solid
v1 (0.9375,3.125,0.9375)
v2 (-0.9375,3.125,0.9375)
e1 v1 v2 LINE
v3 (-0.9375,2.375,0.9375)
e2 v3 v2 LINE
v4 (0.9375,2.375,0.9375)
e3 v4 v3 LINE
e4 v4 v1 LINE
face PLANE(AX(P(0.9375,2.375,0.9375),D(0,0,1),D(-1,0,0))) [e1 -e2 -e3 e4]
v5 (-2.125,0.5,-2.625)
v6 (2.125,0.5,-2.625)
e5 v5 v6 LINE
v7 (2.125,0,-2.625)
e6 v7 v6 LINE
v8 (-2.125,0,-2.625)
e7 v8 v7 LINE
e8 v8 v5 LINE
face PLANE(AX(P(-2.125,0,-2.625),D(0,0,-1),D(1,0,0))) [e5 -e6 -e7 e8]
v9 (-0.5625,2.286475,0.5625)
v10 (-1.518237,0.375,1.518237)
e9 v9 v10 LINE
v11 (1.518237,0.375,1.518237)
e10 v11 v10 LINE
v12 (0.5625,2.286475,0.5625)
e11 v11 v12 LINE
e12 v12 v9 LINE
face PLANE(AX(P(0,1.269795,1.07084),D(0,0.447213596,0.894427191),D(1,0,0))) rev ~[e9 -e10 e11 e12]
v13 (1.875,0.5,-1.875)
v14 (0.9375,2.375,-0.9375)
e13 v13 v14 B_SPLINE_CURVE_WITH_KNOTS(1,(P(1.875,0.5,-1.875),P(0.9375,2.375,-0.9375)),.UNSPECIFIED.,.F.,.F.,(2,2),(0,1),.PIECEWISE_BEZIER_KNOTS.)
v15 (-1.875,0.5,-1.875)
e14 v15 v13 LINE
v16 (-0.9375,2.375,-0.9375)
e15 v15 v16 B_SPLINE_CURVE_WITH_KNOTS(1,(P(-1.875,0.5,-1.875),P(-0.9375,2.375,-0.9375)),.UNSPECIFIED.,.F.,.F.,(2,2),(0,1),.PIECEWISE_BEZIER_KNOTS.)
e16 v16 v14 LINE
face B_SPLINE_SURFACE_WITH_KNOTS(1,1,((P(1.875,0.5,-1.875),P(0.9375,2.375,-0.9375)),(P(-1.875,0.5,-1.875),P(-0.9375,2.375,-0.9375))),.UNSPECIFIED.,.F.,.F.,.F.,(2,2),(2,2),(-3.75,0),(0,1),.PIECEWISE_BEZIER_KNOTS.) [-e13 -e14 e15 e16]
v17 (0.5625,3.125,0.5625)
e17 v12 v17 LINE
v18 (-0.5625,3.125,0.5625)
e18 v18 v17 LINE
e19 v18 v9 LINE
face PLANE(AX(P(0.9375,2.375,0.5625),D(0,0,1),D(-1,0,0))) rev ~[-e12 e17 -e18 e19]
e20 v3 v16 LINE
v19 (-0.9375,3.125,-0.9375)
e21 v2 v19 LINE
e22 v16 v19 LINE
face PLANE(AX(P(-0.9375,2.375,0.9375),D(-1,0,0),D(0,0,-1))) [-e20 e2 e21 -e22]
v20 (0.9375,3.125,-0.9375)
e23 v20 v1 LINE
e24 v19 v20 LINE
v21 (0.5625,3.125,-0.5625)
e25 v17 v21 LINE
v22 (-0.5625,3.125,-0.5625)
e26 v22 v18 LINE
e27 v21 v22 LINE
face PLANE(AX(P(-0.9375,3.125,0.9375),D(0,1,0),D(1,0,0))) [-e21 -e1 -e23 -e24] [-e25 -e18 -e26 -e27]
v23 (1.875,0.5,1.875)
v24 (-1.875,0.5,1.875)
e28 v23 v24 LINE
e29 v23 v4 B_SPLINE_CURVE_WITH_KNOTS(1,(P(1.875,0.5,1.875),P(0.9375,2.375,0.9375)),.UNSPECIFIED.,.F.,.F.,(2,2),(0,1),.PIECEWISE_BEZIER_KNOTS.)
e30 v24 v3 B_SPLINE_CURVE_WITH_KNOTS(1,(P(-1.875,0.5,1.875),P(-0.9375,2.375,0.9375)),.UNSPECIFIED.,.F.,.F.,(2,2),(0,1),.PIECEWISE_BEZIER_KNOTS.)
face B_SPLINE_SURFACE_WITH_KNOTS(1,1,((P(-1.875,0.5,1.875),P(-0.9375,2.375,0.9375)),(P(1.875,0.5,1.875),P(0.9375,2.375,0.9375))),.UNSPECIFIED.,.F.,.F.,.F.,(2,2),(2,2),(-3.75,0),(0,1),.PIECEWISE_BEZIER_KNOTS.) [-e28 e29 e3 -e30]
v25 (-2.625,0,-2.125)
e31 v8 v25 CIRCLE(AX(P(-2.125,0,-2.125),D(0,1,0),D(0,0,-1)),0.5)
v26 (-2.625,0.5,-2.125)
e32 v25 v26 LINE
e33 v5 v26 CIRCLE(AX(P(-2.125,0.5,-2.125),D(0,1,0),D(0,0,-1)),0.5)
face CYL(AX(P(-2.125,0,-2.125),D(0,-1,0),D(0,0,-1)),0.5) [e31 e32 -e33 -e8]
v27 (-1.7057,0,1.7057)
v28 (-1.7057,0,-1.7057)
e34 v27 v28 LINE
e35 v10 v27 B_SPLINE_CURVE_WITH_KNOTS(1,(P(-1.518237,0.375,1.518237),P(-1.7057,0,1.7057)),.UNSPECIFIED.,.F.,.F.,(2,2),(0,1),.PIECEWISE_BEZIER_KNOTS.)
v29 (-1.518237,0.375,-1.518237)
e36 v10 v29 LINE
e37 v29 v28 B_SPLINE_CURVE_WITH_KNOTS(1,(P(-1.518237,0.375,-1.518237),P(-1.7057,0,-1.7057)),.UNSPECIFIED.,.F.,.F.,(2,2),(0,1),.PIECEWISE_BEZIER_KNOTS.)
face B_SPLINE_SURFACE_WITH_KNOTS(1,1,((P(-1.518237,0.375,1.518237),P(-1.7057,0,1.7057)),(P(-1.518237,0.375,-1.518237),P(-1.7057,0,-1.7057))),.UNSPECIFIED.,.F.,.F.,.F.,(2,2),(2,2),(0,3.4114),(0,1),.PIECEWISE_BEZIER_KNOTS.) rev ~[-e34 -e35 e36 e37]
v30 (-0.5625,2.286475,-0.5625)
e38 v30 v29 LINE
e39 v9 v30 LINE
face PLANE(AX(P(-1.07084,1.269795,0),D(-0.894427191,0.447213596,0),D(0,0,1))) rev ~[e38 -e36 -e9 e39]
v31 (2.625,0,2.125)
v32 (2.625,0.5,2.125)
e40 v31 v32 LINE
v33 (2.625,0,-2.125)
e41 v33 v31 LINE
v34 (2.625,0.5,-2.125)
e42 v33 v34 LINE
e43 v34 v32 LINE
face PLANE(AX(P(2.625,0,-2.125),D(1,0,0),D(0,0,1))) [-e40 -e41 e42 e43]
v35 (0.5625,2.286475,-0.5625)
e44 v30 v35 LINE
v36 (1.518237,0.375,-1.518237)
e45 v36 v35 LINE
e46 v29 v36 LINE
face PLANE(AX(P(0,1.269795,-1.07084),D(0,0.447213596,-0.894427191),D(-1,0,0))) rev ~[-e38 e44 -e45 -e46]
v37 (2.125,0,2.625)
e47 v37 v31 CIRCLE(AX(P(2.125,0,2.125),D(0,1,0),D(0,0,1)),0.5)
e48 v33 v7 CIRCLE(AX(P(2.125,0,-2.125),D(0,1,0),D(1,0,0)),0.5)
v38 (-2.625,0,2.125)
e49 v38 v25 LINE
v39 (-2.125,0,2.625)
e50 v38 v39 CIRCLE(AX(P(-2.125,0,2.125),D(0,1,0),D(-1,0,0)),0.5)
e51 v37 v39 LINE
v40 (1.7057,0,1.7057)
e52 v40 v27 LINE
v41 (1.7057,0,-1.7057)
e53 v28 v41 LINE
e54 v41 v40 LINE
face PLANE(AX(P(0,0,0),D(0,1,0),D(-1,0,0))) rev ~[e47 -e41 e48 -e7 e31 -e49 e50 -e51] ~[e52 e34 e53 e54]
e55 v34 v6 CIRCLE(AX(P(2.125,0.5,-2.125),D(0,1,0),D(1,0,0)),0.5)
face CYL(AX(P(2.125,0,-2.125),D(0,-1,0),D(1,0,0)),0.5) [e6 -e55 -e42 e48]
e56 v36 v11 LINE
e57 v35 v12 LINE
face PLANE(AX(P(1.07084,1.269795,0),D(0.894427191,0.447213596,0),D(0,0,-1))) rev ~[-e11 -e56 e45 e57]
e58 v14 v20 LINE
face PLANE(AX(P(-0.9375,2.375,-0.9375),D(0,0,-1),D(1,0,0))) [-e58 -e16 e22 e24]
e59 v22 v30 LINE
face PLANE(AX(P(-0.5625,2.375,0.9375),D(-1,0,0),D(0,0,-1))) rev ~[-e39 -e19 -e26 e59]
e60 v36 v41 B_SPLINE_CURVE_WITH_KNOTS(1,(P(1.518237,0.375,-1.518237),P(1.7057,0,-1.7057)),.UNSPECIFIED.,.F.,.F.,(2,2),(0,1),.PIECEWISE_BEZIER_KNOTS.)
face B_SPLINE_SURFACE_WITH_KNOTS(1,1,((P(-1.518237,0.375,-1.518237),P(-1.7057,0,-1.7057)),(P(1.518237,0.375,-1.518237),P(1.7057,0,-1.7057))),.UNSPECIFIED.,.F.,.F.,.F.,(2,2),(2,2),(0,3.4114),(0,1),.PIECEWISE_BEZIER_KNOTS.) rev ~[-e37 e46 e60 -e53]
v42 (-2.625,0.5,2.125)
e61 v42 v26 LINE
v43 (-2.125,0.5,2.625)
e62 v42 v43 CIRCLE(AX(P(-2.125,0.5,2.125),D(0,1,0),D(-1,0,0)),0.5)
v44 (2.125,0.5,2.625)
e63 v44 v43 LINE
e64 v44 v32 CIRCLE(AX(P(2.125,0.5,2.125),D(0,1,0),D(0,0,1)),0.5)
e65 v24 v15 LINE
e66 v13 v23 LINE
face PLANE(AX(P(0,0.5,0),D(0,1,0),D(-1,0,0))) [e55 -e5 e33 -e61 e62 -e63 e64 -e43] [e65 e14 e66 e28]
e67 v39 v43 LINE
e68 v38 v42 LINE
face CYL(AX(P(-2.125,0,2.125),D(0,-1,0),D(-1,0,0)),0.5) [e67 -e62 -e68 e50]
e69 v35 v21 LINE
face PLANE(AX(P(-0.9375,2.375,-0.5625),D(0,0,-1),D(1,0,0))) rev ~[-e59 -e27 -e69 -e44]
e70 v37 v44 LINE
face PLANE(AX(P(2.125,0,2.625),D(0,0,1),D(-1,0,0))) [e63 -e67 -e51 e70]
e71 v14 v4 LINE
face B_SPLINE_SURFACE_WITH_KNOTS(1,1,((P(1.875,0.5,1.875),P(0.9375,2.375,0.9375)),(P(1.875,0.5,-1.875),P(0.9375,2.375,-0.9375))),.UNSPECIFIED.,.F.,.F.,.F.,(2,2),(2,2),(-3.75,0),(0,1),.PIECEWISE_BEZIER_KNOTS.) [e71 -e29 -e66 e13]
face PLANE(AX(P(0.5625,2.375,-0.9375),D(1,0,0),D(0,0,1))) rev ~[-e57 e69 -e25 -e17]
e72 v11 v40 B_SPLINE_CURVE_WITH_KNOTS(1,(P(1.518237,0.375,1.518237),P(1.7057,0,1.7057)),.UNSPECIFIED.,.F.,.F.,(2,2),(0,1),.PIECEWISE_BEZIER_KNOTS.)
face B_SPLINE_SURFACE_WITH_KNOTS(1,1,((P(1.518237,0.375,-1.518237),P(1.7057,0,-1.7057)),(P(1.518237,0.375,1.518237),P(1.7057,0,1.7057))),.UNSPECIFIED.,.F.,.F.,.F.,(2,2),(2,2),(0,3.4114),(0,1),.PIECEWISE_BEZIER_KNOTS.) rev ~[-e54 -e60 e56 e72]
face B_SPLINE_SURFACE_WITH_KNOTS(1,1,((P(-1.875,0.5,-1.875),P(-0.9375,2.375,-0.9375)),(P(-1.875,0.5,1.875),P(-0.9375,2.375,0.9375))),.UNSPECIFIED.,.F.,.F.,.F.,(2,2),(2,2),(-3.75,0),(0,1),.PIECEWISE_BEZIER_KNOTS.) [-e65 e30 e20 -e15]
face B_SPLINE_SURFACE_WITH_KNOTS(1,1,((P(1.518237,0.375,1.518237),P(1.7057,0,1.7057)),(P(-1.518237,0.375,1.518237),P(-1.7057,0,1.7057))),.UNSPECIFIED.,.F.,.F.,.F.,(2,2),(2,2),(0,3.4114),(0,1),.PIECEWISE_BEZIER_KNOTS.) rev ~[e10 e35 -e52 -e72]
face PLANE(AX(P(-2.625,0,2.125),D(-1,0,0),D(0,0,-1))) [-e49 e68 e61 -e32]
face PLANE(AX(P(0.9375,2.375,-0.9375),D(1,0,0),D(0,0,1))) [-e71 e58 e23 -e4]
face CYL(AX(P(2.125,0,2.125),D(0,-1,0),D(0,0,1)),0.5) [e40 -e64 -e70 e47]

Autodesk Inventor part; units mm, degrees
ref_plane "YZ Plane" through (0, 0, 0) normal (1, 0, 0) x (0, 1, 0)
ref_plane "XZ Plane" through (0, 0, 0) normal (0, 1, 0) x (-1, 0, 0)
sketch "Boceto1" plane through (0, 0, 0) normal (0, 1, 0) x (-1, 0, 0)
  line L0 (-2.125, 2.625) -> (2.125, 2.625)
  line L1 (2.625, 2.125) -> (2.625, -2.125)
  line L2 (2.125, -2.625) -> (-2.125, -2.625)
  line L3 (-2.625, -2.125) -> (-2.625, 2.125)
  line L4 (-2.625, 2.625) -> (2.625, -2.625) construction
  line L5 (2.625, 2.625) -> (-2.625, -2.625) construction
  arc A0 (2.625, 2.125) -> (2.125, 2.625) centre (2.125, 2.125) ccw
  arc A1 (2.125, -2.625) -> (2.625, -2.125) centre (2.125, -2.125) ccw
  arc A2 (-2.625, -2.125) -> (-2.125, -2.625) centre (-2.125, -2.125) ccw
  arc A3 (-2.125, 2.625) -> (-2.625, 2.125) centre (-2.125, 2.125) ccw
  point P0 (0, 0)
  point P1 (0, -2.625)
  dimension "d0" = 0.5
  dimension "d1" = 5.25
  dimension "d2" = 5.25
extrude "Extrusión1" add sketch "Boceto1" along normal blind 0.5
sketch "Boceto2" plane through (0, 0.5, 0) normal (0, 1, 0) x (1, 0, 0)
  line L0 (1.875, -1.875) -> (-1.875, -1.875)
  line L1 (-1.875, -1.875) -> (-1.875, 1.875)
  line L2 (-1.875, 1.875) -> (1.875, 1.875)
  line L3 (1.875, 1.875) -> (1.875, -1.875)
  line L4 (1.875, -1.875) -> (-1.875, 1.875) construction
  line L5 (-1.875, -1.875) -> (1.875, 1.875) construction
  point P0 (0, 0)
  dimension "d5" = 3.75
  dimension "d6" = 3.75
ref_plane "Plano de trabajo1" through (0, 2.375, 0) normal (0, 1, 0) x (1, 0, 0)
sketch "Boceto3" plane through (0, 2.375, 0) normal (0, 1, 0) x (1, 0, 0)
  line L0 (0.9375, -0.9375) -> (-0.9375, -0.9375)
  line L1 (-0.9375, -0.9375) -> (-0.9375, 0.9375)
  line L2 (-0.9375, 0.9375) -> (0.9375, 0.9375)
  line L3 (0.9375, 0.9375) -> (0.9375, -0.9375)
  line L4 (0.9375, -0.9375) -> (-0.9375, 0.9375) construction
  line L5 (-0.9375, -0.9375) -> (0.9375, 0.9375) construction
  point P0 (0, 0)
  dimension "d8" = 1.875
  dimension "d9" = 1.875
loft "Solevación1" add profiles "Boceto2", "Boceto3"
sketch "Boceto4" plane through (-0.9375, 2.375, 0.9375) normal (0, 1, 0) x (1, 0, 0)
  line L0 (1.875, 0) -> (0, 0) projected
  line L1 (1.875, 1.875) -> (1.875, 0) projected
  line L2 (0, 1.875) -> (1.875, 1.875) projected
  line L3 (0, 0) -> (0, 1.875) projected
  point P0 (0.9375, 0.9375)
extrude "Extrusión2" add sketch "Boceto4" along normal blind 0.75
shell "Vaciado5" thickness 0.375 removed faces 1 at (0.3125, 3.125, 0.3125)
sketch "Boceto11" plane through (0, 0, 0) normal (0, 0, 1) x (1, 0, 0)
  line L0 (1.5182, 0.375) -> (0.5625, 2.2865) projected
  line L1 (-1.5182, 0.375) -> (-0.5625, 2.2865) projected
  line L2 (1.5182, 0.375) -> (1.7057, 0)
  line L3 (-1.5182, 0.375) -> (-1.7057, 0)
  line L4 (1.7057, 0) -> (-1.7057, 0)
  point P0 (0, 0)
  point P1 (-2.625, 0)
sketch "Boceto10" plane through (0, 0, 0) normal (0, -1, 0) x (1, 0, 0)
  line L0 (1.7057, 1.7057) -> (-1.7057, 1.7057)
  line L1 (-1.7057, 1.7057) -> (-1.7057, -1.7057)
  line L2 (-1.7057, -1.7057) -> (1.7057, -1.7057)
  line L3 (1.7057, -1.7057) -> (1.7057, 1.7057)
  line L4 (1.7057, 1.7057) -> (-1.7057, -1.7057) construction
  line L5 (-1.7057, 1.7057) -> (1.7057, -1.7057) construction
  point P0 (0, 0)
  point P1 (-1.7057, 0)
  point P2 (-1.7057, 0)
sketch "Boceto12" plane through (-1.5182, 0.375, -1.5182) normal (0, 1, 0) x (1, 0, 0)
  line L0 (3.0365, -3.0365) -> (3.0365, 0) projected
  line L1 (3.0365, 0) -> (0, 0) projected
  line L2 (0, 0) -> (0, -3.0365) projected
  line L3 (0, -3.0365) -> (3.0365, -3.0365) projected
  point P0 (1.5182, -1.5182)
loft "Solevación3" cut profiles "Boceto10" section 1 edges at (1.5182, 0.375, 0) (0, 0.375, -1.5182) (-1.5182, 0.375, 0) (0, 0.375, 1.5182)
equation "\"d2\" = d1"
equation "\"d6\" = d5"
equation "\"d9\" = d8"
properties part number "ejercicio_clase_5"
